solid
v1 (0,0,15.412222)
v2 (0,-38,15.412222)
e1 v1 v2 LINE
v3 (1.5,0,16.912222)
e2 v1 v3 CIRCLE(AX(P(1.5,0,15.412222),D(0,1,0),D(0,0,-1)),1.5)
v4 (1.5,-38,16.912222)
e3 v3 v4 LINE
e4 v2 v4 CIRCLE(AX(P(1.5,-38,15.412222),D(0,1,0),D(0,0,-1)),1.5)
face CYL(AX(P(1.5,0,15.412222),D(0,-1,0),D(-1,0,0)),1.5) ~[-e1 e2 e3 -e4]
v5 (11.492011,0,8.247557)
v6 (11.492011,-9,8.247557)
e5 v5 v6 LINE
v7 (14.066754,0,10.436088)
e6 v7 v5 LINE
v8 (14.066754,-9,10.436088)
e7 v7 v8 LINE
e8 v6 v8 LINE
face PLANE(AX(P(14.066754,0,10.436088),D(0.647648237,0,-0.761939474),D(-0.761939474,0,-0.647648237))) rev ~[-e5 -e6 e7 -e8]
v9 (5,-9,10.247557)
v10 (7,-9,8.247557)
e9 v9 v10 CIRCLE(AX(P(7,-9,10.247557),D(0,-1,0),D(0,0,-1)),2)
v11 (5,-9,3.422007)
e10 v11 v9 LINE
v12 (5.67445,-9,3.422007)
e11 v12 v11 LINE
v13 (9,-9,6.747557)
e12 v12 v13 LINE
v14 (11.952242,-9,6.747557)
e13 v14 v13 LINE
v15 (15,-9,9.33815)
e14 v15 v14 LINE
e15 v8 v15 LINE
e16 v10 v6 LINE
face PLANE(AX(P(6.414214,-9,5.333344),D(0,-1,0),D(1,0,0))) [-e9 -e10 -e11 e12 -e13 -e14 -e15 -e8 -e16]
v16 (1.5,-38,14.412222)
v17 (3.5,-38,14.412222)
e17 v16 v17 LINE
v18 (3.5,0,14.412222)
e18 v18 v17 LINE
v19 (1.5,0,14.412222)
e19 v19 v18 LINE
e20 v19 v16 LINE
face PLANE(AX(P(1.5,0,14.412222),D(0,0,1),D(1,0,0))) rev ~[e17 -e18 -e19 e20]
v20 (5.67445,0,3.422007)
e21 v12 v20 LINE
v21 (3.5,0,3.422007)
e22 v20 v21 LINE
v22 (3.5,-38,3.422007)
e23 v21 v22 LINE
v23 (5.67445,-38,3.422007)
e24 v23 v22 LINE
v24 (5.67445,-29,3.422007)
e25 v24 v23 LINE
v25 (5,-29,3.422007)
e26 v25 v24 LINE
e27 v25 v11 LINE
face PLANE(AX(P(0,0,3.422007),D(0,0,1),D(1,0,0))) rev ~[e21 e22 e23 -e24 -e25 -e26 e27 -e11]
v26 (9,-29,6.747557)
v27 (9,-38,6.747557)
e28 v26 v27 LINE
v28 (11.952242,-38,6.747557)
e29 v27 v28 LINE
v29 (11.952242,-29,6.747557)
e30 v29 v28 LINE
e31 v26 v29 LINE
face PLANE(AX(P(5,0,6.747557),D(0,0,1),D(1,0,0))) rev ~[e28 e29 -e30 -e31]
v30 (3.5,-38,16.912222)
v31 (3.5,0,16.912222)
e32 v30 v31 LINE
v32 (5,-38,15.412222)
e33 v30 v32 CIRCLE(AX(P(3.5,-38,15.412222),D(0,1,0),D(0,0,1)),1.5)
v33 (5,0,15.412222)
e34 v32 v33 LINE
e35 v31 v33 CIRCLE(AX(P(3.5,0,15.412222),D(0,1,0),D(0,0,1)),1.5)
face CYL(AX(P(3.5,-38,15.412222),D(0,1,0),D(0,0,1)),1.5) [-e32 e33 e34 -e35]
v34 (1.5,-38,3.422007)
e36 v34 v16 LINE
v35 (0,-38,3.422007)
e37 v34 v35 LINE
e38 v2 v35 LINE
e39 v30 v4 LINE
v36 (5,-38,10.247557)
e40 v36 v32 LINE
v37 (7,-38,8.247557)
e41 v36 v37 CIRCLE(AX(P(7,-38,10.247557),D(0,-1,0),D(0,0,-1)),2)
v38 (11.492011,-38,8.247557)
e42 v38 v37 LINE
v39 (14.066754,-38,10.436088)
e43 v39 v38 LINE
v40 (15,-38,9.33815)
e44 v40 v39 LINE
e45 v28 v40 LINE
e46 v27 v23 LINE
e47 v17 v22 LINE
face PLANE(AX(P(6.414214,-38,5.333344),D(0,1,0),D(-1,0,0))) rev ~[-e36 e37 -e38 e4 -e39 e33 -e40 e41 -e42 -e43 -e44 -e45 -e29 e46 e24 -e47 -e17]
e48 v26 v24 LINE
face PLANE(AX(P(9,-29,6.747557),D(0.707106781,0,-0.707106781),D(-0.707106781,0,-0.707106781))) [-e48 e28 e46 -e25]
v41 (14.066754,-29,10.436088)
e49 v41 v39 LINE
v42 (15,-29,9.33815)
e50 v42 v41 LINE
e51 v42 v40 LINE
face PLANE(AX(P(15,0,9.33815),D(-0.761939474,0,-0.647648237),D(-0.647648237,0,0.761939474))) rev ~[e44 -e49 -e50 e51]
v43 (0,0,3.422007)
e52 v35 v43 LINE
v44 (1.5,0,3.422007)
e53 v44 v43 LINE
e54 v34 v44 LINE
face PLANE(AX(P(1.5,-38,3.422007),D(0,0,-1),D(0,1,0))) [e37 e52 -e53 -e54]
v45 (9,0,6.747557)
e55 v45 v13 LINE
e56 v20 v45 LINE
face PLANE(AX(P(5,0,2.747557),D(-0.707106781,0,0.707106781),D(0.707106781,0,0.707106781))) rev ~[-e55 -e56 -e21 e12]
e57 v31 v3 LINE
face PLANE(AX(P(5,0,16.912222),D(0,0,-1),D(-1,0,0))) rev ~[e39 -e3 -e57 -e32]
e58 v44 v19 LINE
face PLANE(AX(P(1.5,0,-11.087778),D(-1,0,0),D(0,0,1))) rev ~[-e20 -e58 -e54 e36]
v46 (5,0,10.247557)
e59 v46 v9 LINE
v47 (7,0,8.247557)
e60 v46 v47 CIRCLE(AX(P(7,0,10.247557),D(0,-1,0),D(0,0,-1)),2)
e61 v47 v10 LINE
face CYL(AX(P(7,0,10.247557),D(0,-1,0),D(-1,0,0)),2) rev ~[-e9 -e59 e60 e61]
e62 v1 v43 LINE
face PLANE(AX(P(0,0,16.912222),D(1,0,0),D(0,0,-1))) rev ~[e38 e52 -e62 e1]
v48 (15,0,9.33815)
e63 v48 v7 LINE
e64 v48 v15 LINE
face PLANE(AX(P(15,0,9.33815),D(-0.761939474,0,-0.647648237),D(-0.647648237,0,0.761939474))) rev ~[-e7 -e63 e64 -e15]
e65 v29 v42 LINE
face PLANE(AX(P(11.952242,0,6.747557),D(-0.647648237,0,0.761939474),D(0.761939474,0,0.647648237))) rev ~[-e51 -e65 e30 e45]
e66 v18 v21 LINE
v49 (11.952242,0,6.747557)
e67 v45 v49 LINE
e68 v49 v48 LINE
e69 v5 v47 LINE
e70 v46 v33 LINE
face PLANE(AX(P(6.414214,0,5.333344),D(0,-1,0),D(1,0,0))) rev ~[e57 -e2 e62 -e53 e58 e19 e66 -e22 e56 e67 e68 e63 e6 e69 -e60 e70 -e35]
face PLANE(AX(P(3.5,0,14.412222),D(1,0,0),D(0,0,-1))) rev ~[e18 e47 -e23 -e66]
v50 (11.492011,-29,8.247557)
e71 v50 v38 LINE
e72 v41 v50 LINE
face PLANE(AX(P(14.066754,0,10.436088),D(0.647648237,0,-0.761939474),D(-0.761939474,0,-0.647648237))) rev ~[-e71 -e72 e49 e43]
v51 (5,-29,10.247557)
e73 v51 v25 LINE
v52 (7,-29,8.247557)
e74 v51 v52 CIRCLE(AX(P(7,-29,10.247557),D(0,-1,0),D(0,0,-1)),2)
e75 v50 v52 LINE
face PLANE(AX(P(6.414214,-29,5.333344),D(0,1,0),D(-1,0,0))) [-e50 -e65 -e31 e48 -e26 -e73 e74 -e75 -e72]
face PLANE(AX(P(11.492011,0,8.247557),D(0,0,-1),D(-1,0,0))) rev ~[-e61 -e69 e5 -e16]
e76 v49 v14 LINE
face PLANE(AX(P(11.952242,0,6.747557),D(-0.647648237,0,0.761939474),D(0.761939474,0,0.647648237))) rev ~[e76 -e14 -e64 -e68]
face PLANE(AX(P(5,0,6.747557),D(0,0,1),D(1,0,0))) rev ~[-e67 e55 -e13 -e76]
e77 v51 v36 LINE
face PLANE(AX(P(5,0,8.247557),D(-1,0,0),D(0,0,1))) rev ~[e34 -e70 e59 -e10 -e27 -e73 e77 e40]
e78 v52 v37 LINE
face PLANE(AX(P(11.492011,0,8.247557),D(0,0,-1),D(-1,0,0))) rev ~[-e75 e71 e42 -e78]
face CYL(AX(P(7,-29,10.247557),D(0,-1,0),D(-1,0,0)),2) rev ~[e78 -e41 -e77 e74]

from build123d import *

# Parameters (mm, degrees)
F1_DEPTH    = 38
F3_DEPTH    = 50
F4_T4_DEPTH = 9
F4_T9_DEPTH = 9
F5_W        = 38
F5_H        = 14.5097850376
F6_DEPTH    = 25
F7_R        = 2
F8_R        = 1.5


# Not quite as in the source:
# - a fillet or chamfer that OpenCascade refuses, or shapes differently, is made with other operations: its cross-section is extruded or revolved along the edge and cut away or added


with BuildPart() as f1:
    # F0 (on Front) → F1 (new body)
    with BuildSketch(Plane.XZ):
        Polygon((0, 16.9122221599), (0, -11.0877778401), (1.5, -11.0877778401), (1.5, 14.4122221599), (3.5, 14.4122221599), (3.5, 3.4220071975), (5, 3.4220071975), (5, 6.7475574595), (5, 8.2475574595), (5, 16.9122221599), align=None)
        Polygon((11.4920105912, 8.2475574595), (5, 8.2475574595), (5, 6.7475574595), (11.9522421048, 6.7475574595), (15, 9.3381504056), (14.0667535676, 10.4360879209), align=None)
    extrude(amount=F1_DEPTH)

    # F2 (on face) → F3 (cut)
    with BuildSketch(Plane.XY.offset(16.9122221599)):
        Polygon((16.5792163461, -29), (16.5792163461, -19), (16.5792163461, -9), (5, -9), (5, -29), align=None)
    extrude(amount=-F3_DEPTH, mode=Mode.SUBTRACT)

    # F4: chamfer of 4 on 2 edges, made by hand


with BuildPart() as f4_tool2:
    # F4_s3 → F4_t4 (new body)
    with BuildSketch(Plane.XZ.offset(29)):
        Polygon((9, 6.7475574595), (5, 2.7475574595), (5, 6.7475574595), align=None)
    extrude(amount=F4_T4_DEPTH)

    split(bisect_by=Plane.XY.offset(3.4220071975), keep=Keep.TOP)


with BuildPart() as f1_1:
    add(f1.part)

    # F4_t1: union F4_tool2
    add(f4_tool2.part)


with BuildPart() as f4_tool7:
    # F4_s8 → F4_t9 (new body)
    with BuildSketch(Plane.XZ):
        Polygon((5, 2.7475574595), (9, 6.7475574595), (5, 6.7475574595), align=None)
    extrude(amount=F4_T9_DEPTH)

    split(bisect_by=Plane.XY.offset(3.4220071975), keep=Keep.TOP)


with BuildPart() as f1_2:
    add(f1_1.part)

    # F4_t6: union F4_tool7
    add(f4_tool7.part)

    # F5 (on face) → F6 (cut)
    with BuildSketch(Plane.YZ.offset(1.5)):
        with Locations((-19, -3.8328853213)):
            Rectangle(F5_W, F5_H)
    extrude(amount=-F6_DEPTH, mode=Mode.SUBTRACT)

    # F7
    f7_edges = [f1_2.edges().sort_by_distance(p)[0] for p in [
        (5, -33.5, 8.247557),
        (5, -4.5, 8.247557),
    ]]
    fillet(f7_edges, radius=F7_R)

    # F8
    f8_edges = [f1_2.edges().sort_by_distance(p)[0] for p in [
        (5, -19, 16.912222),
        (0, -19, 16.912222),
    ]]
    fillet(f8_edges, radius=F8_R)


solid = f1_2.part
